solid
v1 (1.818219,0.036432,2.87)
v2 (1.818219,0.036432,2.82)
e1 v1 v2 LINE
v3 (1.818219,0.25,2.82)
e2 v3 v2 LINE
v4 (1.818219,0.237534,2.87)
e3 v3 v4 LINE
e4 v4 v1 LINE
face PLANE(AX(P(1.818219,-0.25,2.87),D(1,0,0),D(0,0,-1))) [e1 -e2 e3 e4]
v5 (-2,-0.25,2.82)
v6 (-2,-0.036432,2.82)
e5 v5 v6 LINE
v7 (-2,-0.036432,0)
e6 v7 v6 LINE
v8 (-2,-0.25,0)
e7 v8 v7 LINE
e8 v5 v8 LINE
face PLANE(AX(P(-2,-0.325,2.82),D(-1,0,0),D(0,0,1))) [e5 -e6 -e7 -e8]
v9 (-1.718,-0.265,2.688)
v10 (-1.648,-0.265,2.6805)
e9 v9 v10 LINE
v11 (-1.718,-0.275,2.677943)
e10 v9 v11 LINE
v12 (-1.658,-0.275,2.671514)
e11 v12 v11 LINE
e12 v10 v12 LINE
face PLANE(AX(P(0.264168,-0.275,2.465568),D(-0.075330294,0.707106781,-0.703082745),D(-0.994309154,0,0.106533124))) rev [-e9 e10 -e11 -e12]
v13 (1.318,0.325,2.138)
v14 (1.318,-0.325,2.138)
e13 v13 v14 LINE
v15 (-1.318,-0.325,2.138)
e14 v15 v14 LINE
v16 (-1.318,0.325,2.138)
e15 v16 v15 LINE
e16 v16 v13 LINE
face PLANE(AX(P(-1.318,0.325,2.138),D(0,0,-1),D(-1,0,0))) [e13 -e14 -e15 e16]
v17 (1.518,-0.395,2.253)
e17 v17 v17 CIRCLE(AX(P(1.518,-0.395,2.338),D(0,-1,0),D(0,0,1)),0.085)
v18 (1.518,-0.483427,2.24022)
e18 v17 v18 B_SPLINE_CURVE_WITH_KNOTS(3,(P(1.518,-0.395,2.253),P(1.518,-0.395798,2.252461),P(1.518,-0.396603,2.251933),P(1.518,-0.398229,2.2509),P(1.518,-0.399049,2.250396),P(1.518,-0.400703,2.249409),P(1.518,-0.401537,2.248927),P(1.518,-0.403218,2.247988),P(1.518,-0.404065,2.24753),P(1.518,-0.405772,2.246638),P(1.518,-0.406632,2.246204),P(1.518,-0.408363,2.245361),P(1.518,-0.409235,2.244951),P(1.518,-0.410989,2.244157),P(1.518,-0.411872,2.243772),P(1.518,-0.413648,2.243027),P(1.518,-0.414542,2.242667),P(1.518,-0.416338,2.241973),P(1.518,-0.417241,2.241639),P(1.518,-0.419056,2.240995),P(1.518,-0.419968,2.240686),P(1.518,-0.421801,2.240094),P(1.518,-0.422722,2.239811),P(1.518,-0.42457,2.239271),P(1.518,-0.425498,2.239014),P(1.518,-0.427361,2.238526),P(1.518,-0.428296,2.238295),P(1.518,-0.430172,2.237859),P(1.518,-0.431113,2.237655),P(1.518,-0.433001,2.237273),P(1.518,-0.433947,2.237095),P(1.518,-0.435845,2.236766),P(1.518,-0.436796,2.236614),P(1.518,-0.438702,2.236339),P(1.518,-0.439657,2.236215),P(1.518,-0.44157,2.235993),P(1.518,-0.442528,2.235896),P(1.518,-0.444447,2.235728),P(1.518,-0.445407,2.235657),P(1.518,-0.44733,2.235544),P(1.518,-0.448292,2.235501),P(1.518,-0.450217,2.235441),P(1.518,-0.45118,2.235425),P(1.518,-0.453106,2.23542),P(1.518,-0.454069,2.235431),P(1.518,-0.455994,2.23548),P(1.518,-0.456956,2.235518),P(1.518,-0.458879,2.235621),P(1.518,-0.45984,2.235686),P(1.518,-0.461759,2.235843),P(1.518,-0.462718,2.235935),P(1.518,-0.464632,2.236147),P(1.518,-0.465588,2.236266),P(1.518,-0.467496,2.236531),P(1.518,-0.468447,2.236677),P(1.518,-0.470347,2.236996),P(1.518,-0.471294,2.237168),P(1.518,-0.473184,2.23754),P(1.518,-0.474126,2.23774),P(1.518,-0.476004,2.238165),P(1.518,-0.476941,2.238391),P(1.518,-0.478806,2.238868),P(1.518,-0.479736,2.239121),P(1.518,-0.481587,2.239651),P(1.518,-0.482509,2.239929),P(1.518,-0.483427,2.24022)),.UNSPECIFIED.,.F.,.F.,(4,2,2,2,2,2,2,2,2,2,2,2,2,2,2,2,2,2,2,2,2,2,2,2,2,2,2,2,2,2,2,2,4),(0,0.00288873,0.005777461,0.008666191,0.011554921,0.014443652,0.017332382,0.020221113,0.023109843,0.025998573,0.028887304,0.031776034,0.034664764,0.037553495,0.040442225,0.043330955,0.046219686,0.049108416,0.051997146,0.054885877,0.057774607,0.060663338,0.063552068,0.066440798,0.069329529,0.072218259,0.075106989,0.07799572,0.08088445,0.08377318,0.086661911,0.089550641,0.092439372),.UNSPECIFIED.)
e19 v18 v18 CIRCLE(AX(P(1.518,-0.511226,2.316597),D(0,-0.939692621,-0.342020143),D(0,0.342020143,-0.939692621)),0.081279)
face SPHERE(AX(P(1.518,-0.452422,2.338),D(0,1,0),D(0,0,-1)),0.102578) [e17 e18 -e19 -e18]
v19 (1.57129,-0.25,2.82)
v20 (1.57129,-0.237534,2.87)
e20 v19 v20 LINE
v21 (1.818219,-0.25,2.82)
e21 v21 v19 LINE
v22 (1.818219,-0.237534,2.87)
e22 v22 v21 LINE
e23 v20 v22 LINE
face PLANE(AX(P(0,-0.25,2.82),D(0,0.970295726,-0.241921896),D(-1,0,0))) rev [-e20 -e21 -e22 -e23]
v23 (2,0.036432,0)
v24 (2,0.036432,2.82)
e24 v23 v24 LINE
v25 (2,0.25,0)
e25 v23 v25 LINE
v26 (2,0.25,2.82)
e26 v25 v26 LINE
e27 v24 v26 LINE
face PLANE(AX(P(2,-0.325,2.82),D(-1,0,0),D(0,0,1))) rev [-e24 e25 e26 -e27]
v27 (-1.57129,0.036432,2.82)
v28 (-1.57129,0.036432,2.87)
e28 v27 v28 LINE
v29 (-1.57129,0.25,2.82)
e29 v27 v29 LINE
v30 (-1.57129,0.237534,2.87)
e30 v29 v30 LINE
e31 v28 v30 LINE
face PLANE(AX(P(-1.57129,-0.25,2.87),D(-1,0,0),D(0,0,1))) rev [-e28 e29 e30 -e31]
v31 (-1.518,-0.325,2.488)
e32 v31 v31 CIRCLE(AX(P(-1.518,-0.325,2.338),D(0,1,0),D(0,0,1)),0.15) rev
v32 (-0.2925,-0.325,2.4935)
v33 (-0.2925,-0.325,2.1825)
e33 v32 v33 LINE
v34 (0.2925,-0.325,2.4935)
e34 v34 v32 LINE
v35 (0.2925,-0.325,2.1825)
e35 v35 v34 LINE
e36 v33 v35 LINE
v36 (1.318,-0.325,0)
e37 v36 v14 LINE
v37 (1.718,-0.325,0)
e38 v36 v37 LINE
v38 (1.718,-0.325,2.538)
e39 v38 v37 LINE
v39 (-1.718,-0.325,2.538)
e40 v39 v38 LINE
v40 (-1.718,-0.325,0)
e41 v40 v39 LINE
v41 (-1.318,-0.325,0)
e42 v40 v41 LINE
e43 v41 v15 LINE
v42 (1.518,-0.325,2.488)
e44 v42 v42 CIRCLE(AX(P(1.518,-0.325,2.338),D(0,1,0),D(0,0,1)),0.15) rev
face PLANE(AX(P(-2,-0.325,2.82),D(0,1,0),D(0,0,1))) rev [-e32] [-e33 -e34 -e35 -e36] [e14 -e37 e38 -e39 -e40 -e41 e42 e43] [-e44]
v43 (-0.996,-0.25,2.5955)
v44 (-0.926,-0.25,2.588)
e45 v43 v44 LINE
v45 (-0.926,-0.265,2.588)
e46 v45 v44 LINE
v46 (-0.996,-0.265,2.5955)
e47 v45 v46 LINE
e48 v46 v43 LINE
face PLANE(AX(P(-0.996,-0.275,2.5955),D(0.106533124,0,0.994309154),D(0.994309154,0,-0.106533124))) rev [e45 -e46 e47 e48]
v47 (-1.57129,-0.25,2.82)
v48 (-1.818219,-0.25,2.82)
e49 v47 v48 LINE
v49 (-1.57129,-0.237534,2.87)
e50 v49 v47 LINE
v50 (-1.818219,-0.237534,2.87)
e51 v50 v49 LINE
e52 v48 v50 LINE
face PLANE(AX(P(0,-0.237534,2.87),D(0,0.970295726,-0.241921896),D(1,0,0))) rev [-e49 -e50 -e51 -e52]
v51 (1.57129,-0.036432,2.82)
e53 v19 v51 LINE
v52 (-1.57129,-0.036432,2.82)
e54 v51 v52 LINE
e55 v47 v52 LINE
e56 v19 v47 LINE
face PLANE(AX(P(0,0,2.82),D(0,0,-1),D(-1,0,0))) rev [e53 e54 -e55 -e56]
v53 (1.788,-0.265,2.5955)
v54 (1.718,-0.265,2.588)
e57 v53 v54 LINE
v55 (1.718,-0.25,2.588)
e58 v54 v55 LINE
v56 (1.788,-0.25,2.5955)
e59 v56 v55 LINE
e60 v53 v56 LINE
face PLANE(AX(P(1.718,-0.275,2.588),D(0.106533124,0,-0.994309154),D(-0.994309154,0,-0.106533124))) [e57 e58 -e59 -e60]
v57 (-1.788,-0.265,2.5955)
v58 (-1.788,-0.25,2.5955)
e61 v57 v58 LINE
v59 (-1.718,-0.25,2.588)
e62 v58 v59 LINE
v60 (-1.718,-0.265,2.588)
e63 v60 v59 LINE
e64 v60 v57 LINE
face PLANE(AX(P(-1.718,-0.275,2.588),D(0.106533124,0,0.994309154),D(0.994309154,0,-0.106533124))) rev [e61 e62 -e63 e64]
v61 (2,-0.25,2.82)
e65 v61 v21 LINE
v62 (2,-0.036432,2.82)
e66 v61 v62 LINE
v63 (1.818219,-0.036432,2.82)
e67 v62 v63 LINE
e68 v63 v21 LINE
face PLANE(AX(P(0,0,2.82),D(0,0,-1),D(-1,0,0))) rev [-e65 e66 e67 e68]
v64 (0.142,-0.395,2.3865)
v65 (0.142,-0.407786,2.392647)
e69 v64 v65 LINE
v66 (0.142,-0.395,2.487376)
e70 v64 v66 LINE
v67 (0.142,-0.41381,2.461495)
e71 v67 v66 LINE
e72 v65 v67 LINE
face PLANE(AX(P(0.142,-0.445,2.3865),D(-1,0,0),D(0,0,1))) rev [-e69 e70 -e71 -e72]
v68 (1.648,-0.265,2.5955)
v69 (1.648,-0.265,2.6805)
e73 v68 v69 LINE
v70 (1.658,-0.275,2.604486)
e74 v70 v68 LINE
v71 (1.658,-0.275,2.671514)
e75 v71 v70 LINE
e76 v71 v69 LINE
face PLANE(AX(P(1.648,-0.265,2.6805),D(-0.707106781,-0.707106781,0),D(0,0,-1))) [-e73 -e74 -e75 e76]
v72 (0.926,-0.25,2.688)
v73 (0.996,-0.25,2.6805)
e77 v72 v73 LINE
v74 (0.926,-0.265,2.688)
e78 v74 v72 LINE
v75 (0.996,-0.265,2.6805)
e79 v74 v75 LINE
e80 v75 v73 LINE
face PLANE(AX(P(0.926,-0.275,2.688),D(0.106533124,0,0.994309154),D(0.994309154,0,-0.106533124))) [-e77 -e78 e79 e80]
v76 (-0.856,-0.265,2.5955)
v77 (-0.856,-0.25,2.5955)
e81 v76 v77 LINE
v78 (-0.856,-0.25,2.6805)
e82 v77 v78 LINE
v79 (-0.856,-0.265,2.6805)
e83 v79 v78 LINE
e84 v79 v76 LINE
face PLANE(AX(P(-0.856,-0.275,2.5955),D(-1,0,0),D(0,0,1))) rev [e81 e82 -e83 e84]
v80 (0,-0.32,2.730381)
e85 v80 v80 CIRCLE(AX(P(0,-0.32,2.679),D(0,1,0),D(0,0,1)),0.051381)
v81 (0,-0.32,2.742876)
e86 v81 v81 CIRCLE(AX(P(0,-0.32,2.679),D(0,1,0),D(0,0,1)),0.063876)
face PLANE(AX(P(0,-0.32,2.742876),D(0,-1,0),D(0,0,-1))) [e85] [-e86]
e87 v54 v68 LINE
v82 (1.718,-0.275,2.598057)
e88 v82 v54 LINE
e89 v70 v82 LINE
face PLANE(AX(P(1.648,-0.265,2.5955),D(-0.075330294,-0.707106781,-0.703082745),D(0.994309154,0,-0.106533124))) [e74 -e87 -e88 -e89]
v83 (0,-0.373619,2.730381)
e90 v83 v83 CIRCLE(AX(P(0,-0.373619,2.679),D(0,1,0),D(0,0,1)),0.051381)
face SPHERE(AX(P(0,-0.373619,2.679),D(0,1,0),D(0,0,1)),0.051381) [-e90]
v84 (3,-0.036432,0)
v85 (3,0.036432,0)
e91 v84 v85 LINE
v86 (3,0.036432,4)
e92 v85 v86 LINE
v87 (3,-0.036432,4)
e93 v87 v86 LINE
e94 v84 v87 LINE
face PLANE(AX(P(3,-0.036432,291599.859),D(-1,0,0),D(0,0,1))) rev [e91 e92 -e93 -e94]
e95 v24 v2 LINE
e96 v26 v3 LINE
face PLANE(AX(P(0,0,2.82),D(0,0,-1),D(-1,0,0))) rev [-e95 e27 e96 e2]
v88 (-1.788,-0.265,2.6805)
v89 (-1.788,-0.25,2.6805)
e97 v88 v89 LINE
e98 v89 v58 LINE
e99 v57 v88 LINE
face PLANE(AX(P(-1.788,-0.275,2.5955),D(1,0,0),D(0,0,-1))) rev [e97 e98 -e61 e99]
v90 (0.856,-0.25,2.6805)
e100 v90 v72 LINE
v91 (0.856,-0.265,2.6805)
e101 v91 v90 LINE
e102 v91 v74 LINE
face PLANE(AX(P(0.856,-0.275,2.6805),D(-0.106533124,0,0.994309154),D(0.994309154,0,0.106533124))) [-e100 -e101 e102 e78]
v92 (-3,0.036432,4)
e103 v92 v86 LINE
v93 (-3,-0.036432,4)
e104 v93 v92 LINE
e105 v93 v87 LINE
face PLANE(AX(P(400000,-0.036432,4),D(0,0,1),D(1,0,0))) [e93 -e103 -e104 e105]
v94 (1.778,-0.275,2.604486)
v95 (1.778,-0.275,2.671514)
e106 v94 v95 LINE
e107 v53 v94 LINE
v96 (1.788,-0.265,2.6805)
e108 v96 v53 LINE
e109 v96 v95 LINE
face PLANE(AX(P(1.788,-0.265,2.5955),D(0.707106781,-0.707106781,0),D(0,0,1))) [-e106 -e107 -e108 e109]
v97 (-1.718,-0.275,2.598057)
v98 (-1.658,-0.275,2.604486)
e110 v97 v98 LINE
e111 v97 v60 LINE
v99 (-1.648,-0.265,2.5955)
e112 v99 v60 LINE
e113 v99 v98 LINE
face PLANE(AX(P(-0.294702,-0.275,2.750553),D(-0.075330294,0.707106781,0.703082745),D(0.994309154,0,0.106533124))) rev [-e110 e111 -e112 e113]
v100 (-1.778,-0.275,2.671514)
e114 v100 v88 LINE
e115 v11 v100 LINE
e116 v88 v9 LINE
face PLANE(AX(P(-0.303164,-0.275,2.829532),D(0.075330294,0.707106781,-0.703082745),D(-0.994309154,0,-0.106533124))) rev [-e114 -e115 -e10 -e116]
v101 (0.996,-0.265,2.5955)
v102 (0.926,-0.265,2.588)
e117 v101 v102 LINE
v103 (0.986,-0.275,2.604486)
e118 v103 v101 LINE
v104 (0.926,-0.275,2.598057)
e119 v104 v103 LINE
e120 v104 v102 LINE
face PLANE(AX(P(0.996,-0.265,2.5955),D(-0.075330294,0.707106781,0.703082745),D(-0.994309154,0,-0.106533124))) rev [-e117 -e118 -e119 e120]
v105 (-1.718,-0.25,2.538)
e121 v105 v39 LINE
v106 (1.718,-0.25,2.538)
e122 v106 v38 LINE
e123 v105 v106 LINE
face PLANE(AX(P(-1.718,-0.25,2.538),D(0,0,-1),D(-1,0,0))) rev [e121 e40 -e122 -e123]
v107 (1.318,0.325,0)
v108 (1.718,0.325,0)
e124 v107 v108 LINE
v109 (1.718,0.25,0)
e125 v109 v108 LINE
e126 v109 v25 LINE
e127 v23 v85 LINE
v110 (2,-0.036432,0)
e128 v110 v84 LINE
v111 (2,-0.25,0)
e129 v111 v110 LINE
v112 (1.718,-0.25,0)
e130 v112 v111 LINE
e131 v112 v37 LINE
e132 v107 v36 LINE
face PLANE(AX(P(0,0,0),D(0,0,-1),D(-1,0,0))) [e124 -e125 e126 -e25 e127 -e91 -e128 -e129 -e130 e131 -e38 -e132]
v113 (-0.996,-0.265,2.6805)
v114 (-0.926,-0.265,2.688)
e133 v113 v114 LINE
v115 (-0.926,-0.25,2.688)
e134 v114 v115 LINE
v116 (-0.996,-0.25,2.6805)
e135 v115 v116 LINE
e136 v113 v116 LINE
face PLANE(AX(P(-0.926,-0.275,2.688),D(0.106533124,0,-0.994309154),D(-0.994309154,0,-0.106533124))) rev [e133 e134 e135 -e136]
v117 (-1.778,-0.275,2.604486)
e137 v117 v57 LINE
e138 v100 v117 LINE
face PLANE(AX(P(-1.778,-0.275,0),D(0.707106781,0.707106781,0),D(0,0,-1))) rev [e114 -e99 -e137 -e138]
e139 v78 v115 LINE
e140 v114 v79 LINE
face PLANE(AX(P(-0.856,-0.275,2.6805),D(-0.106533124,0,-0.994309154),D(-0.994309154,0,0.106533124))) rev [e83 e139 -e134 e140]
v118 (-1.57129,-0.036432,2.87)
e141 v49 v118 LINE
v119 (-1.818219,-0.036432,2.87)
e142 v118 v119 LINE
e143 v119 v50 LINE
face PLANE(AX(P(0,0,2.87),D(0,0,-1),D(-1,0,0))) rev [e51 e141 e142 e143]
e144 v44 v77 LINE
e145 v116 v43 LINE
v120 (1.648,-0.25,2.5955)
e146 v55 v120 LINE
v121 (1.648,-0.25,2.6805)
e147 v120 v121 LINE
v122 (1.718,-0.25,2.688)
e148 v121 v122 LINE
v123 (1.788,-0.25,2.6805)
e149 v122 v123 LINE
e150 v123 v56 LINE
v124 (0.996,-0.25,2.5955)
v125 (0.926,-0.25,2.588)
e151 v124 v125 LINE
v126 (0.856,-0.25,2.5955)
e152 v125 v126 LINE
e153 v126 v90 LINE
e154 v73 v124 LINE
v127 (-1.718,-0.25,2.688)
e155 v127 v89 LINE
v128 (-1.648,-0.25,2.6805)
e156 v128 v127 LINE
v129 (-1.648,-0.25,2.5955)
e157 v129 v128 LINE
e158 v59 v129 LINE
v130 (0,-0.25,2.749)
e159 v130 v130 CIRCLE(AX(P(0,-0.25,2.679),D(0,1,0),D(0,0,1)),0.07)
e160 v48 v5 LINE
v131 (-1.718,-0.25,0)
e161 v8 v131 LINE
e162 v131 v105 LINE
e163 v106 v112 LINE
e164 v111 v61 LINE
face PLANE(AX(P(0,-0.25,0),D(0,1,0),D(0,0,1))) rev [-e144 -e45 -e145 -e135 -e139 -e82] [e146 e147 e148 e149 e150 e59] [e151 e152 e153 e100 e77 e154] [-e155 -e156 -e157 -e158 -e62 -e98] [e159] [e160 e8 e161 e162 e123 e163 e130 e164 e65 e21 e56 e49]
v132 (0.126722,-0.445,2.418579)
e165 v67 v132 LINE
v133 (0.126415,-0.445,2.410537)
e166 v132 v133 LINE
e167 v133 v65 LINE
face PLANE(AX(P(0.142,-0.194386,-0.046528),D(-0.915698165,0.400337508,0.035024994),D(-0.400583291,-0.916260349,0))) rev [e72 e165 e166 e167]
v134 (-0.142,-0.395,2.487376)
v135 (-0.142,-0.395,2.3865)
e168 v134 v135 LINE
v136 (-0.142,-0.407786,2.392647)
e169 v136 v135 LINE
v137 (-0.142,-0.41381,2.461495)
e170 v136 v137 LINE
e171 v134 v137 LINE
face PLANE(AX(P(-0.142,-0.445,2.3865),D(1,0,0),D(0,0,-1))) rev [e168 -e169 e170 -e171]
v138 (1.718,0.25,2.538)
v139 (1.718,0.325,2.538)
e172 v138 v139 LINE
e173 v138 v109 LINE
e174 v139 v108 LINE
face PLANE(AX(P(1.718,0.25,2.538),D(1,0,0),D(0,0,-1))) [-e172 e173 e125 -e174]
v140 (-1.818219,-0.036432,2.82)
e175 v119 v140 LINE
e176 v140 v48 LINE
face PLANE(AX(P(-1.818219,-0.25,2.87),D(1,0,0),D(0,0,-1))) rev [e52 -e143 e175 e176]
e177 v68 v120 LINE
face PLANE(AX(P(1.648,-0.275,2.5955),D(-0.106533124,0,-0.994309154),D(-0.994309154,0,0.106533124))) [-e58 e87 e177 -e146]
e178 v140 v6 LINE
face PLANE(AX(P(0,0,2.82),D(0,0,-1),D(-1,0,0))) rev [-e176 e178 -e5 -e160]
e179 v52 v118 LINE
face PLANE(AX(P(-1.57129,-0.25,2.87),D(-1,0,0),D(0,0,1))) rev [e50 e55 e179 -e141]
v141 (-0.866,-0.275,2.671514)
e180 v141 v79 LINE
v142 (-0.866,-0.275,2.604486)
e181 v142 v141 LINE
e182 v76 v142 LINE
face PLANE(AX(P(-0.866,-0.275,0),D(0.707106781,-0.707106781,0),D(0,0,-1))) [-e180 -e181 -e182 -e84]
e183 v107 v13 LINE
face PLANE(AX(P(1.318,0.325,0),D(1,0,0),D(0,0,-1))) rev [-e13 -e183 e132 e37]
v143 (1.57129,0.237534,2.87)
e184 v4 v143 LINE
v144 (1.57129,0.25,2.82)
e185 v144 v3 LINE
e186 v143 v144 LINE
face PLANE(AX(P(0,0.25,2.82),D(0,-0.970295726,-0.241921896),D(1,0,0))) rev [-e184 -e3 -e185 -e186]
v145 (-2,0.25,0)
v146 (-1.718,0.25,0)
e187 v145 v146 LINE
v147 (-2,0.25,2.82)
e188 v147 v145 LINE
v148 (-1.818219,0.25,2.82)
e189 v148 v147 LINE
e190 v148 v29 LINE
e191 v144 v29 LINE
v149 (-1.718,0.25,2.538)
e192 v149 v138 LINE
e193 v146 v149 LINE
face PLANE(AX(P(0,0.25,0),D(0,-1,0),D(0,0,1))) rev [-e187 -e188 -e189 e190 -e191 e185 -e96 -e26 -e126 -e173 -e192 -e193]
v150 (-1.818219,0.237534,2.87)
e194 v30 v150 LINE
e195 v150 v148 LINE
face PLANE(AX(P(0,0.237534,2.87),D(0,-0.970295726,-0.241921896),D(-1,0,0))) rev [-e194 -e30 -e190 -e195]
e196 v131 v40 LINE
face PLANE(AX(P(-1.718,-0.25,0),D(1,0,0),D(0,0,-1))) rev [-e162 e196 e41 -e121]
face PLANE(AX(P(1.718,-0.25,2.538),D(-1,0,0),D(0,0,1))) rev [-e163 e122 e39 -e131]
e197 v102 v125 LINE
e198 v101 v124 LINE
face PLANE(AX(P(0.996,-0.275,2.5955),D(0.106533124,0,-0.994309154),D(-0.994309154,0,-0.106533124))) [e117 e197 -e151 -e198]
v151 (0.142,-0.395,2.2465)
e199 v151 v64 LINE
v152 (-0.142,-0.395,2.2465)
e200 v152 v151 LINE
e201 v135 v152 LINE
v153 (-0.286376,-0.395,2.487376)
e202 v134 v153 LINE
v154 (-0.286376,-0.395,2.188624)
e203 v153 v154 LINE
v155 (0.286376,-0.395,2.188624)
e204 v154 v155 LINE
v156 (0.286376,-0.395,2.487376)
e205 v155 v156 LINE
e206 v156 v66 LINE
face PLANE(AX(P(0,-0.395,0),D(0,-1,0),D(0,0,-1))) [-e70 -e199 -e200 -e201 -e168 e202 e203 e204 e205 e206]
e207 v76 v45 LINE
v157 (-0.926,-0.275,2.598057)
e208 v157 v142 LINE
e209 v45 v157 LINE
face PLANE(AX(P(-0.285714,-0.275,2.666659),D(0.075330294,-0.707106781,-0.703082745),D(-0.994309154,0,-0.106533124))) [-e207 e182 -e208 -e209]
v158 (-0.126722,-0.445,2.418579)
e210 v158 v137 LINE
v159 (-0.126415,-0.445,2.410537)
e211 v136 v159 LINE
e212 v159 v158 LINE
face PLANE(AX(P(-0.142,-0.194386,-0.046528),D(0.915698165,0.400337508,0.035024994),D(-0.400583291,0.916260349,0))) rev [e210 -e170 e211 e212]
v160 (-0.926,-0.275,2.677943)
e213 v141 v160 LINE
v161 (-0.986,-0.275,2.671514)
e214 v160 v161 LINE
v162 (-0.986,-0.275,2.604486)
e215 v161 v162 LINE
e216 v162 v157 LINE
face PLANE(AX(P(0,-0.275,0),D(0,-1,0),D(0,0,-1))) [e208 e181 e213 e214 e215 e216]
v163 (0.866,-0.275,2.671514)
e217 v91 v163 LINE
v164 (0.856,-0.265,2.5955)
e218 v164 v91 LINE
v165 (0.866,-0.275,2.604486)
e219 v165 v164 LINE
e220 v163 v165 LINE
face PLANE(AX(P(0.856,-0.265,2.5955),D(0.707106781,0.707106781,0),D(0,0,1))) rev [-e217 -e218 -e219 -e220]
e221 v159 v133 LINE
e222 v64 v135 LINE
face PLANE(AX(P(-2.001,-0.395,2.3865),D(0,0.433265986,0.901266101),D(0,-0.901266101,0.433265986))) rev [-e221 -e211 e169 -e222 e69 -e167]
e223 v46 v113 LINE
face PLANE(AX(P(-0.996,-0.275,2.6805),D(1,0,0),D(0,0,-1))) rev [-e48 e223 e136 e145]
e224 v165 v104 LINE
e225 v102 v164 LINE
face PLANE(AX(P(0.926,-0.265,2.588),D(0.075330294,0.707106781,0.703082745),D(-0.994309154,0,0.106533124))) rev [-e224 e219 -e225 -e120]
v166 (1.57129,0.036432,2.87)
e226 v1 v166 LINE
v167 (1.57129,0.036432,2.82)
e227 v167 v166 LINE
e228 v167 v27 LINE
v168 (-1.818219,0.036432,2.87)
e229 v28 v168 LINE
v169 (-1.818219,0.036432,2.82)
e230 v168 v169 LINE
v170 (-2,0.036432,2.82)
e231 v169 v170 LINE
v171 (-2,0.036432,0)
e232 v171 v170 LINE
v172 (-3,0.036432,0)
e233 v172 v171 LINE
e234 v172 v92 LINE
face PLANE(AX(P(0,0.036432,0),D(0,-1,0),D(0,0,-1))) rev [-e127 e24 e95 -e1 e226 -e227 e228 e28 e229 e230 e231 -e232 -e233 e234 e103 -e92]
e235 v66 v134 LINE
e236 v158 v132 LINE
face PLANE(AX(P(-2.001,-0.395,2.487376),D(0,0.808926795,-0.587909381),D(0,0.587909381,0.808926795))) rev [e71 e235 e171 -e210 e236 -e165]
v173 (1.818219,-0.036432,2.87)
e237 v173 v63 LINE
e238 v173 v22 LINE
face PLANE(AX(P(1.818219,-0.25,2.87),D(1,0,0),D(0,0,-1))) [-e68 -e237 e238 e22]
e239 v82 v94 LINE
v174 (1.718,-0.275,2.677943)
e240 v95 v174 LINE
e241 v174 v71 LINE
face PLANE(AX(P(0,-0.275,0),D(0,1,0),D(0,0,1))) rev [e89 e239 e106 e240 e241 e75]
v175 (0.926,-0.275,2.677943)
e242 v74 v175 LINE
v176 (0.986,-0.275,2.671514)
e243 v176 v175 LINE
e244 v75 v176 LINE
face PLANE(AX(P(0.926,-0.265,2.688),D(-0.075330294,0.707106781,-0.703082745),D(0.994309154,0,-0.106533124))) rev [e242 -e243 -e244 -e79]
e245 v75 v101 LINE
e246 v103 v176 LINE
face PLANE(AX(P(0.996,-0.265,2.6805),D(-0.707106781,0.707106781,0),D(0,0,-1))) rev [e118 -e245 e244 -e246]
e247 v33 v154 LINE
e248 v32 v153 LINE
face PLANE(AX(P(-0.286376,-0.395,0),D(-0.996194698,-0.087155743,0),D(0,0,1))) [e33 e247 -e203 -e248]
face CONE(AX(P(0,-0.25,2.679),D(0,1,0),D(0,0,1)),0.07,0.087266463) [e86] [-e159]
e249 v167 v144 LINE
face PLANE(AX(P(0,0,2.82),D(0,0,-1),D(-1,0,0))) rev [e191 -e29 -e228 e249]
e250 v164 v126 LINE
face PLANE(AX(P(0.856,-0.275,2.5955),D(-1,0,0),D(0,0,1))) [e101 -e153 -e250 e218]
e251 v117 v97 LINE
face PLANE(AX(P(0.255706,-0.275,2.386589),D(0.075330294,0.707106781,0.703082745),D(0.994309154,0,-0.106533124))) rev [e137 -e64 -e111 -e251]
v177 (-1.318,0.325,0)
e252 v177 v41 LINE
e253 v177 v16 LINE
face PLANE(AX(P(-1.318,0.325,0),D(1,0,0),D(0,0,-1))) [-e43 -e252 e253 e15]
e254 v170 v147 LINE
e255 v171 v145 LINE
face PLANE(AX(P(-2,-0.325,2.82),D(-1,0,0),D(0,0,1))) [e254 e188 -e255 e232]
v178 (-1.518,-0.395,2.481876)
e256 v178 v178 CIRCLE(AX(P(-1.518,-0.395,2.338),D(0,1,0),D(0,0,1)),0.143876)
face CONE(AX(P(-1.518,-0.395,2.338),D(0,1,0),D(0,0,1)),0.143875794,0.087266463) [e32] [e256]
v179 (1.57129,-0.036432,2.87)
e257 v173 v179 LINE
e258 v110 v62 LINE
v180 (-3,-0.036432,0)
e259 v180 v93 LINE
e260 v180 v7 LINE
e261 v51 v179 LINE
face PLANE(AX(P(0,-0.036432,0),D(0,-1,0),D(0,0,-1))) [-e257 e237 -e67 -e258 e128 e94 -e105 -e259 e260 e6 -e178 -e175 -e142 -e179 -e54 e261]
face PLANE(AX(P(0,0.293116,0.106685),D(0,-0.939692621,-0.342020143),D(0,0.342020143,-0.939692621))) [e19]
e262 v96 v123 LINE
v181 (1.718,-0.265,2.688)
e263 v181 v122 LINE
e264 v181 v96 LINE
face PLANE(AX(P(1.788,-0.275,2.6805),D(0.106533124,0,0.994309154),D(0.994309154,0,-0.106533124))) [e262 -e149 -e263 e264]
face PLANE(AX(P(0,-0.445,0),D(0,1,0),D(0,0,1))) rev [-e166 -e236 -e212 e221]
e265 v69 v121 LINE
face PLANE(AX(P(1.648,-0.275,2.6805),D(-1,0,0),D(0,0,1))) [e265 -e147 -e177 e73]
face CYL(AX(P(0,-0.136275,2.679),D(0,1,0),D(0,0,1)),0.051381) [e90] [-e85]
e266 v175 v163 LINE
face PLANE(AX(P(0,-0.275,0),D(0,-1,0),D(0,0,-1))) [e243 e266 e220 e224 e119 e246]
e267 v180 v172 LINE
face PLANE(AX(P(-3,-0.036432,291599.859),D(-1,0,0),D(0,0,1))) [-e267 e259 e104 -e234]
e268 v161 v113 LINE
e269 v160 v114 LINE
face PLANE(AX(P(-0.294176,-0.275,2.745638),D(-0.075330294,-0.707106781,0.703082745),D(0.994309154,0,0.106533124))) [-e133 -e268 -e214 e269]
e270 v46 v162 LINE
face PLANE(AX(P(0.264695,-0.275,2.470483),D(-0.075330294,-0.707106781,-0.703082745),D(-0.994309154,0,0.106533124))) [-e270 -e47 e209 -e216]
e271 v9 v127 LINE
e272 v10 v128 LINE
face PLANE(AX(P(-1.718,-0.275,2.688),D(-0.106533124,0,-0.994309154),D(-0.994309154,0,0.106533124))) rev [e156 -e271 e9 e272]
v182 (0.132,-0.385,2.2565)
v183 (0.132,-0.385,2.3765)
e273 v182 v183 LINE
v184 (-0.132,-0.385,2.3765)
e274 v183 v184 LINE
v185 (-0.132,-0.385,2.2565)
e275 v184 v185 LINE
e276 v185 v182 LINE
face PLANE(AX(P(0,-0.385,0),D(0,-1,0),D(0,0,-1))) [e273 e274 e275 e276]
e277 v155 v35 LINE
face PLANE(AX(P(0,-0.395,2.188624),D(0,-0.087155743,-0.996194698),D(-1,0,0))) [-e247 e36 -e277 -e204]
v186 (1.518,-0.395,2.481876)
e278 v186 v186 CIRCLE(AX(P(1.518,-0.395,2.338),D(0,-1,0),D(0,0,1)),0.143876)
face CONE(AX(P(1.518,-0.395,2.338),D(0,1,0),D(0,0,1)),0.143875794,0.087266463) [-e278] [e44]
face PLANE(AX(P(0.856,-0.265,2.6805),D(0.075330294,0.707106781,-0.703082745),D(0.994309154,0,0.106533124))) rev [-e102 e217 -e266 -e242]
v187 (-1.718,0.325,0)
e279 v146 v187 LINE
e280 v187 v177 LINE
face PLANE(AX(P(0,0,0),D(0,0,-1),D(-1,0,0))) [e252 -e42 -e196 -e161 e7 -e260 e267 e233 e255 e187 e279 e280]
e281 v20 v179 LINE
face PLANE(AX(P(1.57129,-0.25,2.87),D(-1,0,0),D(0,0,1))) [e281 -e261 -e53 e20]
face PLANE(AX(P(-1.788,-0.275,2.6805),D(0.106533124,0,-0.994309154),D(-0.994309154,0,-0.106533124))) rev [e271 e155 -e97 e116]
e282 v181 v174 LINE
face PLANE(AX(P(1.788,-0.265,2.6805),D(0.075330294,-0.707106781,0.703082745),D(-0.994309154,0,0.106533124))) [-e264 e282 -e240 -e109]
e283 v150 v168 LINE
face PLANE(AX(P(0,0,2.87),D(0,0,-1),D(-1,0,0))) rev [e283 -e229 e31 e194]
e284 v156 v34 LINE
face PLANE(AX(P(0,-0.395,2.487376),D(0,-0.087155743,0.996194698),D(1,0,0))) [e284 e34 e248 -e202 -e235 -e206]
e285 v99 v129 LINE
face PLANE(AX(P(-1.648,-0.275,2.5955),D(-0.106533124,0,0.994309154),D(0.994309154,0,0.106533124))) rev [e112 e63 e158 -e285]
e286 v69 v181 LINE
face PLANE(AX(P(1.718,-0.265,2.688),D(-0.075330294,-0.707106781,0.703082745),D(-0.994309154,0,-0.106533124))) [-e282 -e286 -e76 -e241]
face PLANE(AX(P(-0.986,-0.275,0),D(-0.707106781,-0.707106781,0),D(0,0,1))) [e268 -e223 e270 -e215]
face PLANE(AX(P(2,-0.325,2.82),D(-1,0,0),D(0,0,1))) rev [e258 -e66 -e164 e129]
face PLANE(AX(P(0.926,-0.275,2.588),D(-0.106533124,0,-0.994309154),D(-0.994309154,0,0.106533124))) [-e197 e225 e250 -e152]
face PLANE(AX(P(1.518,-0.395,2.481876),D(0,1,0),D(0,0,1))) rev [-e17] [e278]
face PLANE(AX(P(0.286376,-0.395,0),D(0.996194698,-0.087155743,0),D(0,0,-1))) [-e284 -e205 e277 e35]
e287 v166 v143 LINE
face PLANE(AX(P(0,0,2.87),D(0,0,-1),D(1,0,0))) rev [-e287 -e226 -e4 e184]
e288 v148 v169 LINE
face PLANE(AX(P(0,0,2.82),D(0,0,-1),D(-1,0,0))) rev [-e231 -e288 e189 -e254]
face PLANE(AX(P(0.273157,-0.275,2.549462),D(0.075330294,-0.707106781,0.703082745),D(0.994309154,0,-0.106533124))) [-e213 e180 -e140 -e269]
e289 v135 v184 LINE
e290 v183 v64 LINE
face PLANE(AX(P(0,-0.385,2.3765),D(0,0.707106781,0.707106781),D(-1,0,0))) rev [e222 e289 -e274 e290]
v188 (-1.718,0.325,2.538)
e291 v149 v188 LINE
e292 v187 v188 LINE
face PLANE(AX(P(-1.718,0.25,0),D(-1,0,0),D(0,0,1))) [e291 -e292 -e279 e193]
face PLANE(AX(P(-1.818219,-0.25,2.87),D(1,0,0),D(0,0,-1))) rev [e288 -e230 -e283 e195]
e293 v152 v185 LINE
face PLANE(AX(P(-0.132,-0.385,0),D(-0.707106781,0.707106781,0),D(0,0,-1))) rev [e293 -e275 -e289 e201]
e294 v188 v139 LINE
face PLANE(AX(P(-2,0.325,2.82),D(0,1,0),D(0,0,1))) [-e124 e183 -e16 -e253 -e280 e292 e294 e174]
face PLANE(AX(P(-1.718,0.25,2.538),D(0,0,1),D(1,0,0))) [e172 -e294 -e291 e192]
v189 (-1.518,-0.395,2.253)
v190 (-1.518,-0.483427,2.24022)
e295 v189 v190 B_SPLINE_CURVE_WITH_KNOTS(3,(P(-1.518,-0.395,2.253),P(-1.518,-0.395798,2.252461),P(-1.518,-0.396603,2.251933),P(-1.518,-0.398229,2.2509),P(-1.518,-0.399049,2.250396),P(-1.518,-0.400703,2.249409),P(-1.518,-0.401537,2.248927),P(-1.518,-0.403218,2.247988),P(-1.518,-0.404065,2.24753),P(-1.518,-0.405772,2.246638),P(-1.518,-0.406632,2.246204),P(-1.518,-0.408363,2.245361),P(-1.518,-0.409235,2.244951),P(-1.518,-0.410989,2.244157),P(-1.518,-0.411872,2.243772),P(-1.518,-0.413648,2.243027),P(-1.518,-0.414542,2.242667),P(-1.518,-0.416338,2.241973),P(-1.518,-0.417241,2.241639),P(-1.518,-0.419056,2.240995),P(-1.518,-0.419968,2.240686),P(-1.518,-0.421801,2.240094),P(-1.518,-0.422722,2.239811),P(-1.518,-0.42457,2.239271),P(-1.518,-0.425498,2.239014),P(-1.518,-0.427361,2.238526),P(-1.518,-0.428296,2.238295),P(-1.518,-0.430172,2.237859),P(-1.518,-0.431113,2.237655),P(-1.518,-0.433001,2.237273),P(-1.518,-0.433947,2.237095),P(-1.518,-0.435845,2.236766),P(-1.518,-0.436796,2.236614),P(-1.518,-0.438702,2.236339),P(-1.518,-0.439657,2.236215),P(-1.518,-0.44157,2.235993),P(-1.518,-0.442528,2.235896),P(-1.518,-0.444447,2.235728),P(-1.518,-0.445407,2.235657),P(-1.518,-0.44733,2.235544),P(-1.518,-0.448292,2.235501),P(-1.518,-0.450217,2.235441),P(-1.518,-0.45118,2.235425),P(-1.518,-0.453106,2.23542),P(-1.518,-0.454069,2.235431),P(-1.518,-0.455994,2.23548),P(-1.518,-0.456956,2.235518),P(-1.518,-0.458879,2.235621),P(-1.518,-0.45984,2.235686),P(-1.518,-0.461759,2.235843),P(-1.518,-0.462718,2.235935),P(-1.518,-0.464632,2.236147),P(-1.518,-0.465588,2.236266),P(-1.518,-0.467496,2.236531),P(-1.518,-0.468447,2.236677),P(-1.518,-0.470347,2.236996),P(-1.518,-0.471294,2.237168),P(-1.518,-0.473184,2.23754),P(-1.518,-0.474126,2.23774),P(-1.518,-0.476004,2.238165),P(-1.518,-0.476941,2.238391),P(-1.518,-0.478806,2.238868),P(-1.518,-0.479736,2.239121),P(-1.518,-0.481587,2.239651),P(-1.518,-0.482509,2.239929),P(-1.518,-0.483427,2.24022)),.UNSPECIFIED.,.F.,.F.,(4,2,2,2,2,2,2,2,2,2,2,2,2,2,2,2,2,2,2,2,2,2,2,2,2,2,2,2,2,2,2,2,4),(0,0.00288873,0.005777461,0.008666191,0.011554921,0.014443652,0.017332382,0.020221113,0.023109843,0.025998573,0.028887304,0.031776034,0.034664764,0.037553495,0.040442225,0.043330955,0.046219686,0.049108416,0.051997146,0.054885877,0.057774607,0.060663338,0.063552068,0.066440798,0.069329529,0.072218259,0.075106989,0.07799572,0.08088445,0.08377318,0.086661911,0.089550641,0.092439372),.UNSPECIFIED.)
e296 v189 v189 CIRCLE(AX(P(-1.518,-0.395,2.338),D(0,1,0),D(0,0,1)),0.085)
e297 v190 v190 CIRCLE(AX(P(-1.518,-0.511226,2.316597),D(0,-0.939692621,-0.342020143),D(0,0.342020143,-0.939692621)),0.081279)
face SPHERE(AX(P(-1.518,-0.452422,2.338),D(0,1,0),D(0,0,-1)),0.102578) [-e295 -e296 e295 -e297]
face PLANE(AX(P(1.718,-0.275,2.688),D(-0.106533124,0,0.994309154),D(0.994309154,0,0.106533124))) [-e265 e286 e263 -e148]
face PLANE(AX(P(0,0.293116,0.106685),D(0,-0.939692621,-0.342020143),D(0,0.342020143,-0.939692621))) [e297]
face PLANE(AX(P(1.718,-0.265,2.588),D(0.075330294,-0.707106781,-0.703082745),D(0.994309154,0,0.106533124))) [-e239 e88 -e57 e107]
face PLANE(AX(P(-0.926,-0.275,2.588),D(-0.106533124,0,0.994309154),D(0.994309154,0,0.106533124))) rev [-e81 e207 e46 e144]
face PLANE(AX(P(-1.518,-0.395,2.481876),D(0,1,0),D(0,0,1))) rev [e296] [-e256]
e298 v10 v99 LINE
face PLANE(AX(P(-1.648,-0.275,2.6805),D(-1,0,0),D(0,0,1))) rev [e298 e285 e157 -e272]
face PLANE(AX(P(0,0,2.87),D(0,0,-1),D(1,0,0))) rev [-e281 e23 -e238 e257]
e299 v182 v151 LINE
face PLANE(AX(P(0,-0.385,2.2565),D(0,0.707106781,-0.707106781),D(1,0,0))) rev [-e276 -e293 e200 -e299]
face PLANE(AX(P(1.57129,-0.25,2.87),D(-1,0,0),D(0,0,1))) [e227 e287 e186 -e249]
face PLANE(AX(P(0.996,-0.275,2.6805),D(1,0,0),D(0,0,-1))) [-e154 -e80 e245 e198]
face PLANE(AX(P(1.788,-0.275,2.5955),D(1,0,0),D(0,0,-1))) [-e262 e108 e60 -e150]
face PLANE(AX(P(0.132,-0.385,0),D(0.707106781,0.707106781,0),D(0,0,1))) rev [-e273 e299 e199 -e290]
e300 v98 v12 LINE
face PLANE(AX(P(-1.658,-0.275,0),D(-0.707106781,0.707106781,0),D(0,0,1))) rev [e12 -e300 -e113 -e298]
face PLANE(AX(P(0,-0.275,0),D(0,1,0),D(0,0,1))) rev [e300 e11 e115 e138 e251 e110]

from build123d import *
from OCP.BRepFilletAPI import BRepFilletAPI_MakeChamfer

# Parameters (mm, degrees)
SKETCH1_W                 = 4
SKETCH1_H                 = 0.65
BOSS_EXTRUDE1_DEPTH       = 2.82
CUT_EXTRUDE1_DEPTH        = 0.075
SKETCH3_W                 = 2.636
SKETCH3_H                 = 2.138
CUT_EXTRUDE2_DEPTH        = 4.517797606
BOSS_EXTRUDE2_DEPTH       = 0.025
CHAMFER1_SIZE             = 0.01
SKETCH8_W                 = 0.439976945
SKETCH8_H                 = 0.57304899
CUT_EXTRUDE3_DEPTH        = 0.04
SKETCH9_W                 = 0.585
SKETCH9_H                 = 0.311
BOSS_EXTRUDE3_DEPTH       = 0.07
CHAMFER2_SIZE             = 0.07
CHAMFER2_SIZE_2           = 0.006124206
SKETCH10_W                = 0.284
SKETCH10_H                = 0.14
CUT_EXTRUDE4_DEPTH        = 0.01
CHAMFER3_SIZE             = 0.01
SKETCH11_W                = 0.284
SKETCH11_H                = 0.100875794
BOSS_EXTRUDE4_DEPTH       = 0.05
CUT_EXTRUDE5_REACH        = 5.582
CUT_EXTRUDE6_REACH        = 5.25
SKETCH14_W                = 0.246928611
SKETCH14_H                = 0.5
BOSS_EXTRUDE5_DEPTH       = 0.05
CHAMFER4_SIZE             = 0.05
CHAMFER4_SIZE2            = 0.0124664
CHAMFER4_OF_MIRROR4_SIZE  = 0.05
CHAMFER4_OF_MIRROR4_SIZE2 = 0.0124664
BOSS_EXTRUDE6_START       = -0.25
BOSS_EXTRUDE6_DEPTH       = 0.0364325


# Some blends are built 0.0001 mm under size
with BuildPart() as part:
    # Sketch1 → Boss-Extrude1 (new body)
    with BuildSketch(Plane.XY):
        Rectangle(SKETCH1_W, SKETCH1_H)
    extrude(amount=BOSS_EXTRUDE1_DEPTH)

    # Sketch2 → Cut-Extrude1 (cut)
    with BuildSketch(Plane.XZ.offset(0.325)):
        Polygon((-2, 0), (-1.718, 0), (-1.718, 2.538), (1.718, 2.538), (1.718, 0), (2, 0), (2, 2.82), (-2, 2.82), align=None)
    cut_extrude1 = extrude(amount=-CUT_EXTRUDE1_DEPTH, mode=Mode.SUBTRACT)

    # Sketch3 → Cut-Extrude2 (cut, through all)
    with BuildSketch(Plane.XZ.offset(0.325)):
        with Locations((0, 1.069)):
            Rectangle(SKETCH3_W, SKETCH3_H)
    extrude(amount=-CUT_EXTRUDE2_DEPTH, mode=Mode.SUBTRACT)

    # Mirror1: Cut-Extrude1 across plane
    add(cut_extrude1.mirror(Plane(origin=(0, 0, 0), x_dir=(0, 0, 1), z_dir=(0, -1, 0))), mode=Mode.SUBTRACT)

    # Sketch4 → Boss-Extrude2 (add)
    with BuildSketch(Plane.XZ.offset(0.25)):
        Polygon((-1.788, 2.6805), (-1.718, 2.688), (-1.648, 2.6805), (-1.648, 2.5955), (-1.718, 2.588), (-1.788, 2.5955), align=None)
        Polygon((-0.996, 2.6805), (-0.996, 2.5955), (-0.926, 2.588), (-0.856, 2.5955), (-0.856, 2.6805), (-0.926, 2.688), align=None)
    boss_extrude2 = extrude(amount=BOSS_EXTRUDE2_DEPTH)

    # Mirror2: Boss-Extrude2 across plane
    add(boss_extrude2.mirror(Plane(origin=(0, 0, 0), x_dir=(0, 0, 1), z_dir=(1, 0, 0))))

    # Chamfer1
    chamfer1_edges = [part.edges().sort_by_distance(p)[0] for p in [
        (-0.856, -0.275, 2.638),
        (-0.891, -0.275, 2.68425),
        (1.788, -0.275, 2.638),
        (1.753, -0.275, 2.68425),
        (1.683, -0.275, 2.68425),
        (1.648, -0.275, 2.638),
        (1.683, -0.275, 2.59175),
        (1.753, -0.275, 2.59175),
        (0.961, -0.275, 2.68425),
        (0.891, -0.275, 2.68425),
        (0.856, -0.275, 2.638),
        (0.891, -0.275, 2.59175),
        (0.961, -0.275, 2.59175),
        (0.996, -0.275, 2.638),
        (-1.788, -0.275, 2.638),
        (-1.753, -0.275, 2.59175),
        (-1.683, -0.275, 2.59175),
        (-1.648, -0.275, 2.638),
        (-1.683, -0.275, 2.68425),
        (-1.753, -0.275, 2.68425),
        (-0.961, -0.275, 2.68425),
        (-0.996, -0.275, 2.638),
        (-0.961, -0.275, 2.59175),
        (-0.891, -0.275, 2.59175),
    ]]
    chamfer(chamfer1_edges, length=CHAMFER1_SIZE)

    # Sketch5 → Revolve1 (revolve)
    with BuildSketch(Plane(origin=(0, 0, 0), x_dir=(0, 0, -1), z_dir=(1, 0, 0))):
        with BuildLine():
            Line((-2.749, -0.25), (-2.742875794, -0.32))
            Line((-2.742875794, -0.32), (-2.730380956, -0.32))
            Line((-2.730380956, -0.32), (-2.730380956, -0.373619044))
            ThreePointArc((-2.730380956, -0.373619044), (-2.715331822, -0.409950867), (-2.679, -0.425))
            Line((-2.679, -0.425), (-2.679, -0.25))
            Line((-2.679, -0.25), (-2.749, -0.25))
        make_face()
    revolve(axis=Axis((0, -0.136274993, 2.679), (0, -1, 0)))

    # Sketch6 → Revolve2 (revolve)
    with BuildSketch(Plane.ZY.offset(1.518), mode=Mode.PRIVATE) as revolve2_sk:
        with BuildLine():
            Line((2.488, -0.325), (2.481875794, -0.395))
            Line((2.481875794, -0.395), (2.423, -0.395))
            ThreePointArc((2.423, -0.395), (2.428588355, -0.500546938), (2.338, -0.555))
            Line((2.338, -0.555), (2.338, -0.325))
            Line((2.338, -0.325), (2.488, -0.325))
        make_face()
    revolve2 = revolve(revolve2_sk.sketch.rotate(Axis((-1.518, -0.325, 2.338), (0, -1, 0)), 180), axis=Axis((-1.518, -0.325, 2.338), (0, -1, 0)))

    # Sketch8 → Cut-Extrude3 (cut)
    with BuildSketch(Plane(origin=(0, 0.255528239, 0.093004673), x_dir=(-1, 0, 0), z_dir=(0, -0.9396926207859105, -0.34202014332566305))):
        with Locations((1.555484276, -2.396112054)):
            Rectangle(SKETCH8_W, SKETCH8_H)
    cut_extrude3 = extrude(amount=-CUT_EXTRUDE3_DEPTH, mode=Mode.SUBTRACT)

    # Mirror3: Revolve2, Cut-Extrude3 across plane
    add(revolve2.mirror(Plane(origin=(0, 0, 0), x_dir=(0, 0, 1), z_dir=(1, 0, 0))))
    add(cut_extrude3.mirror(Plane(origin=(0, 0, 0), x_dir=(0, 0, 1), z_dir=(1, 0, 0))), mode=Mode.SUBTRACT)

    # Sketch9 → Boss-Extrude3 (add)
    with BuildSketch(Plane.XZ.offset(0.325)):
        with Locations((0, 2.338)):
            Rectangle(SKETCH9_W, SKETCH9_H)
    extrude(amount=BOSS_EXTRUDE3_DEPTH)

    # Chamfer2
    # the kernel refuses this chamfer: 0.07, 0.006124206 mm, written as the material it takes off along each edge
    with BuildSketch(Plane(origin=(-0.474474386, -0.395, 2.4935), x_dir=(0, 0.9999943799678763, 0.00335261579403213), z_dir=(1, 0, 0))) as chamfer2_piece_1_section:
        Polygon((CHAMFER2_SIZE * 0.999994379968, -CHAMFER2_SIZE * 0.00335261579403), (-CHAMFER2_SIZE_2 * 0.00335261603863, -CHAMFER2_SIZE_2 * 0.999994452926), (0, 0), align=None)
    chamfer2_piece_1 = extrude(amount=0.948948771, mode=Mode.PRIVATE)
    chamfer2_piece_1 = split(chamfer2_piece_1, bisect_by=Plane(origin=(0, -0.325, 2.492252254), z_dir=(0, -1, 0)), keep=Keep.TOP, mode=Mode.PRIVATE)
    add(chamfer2_piece_1, mode=Mode.SUBTRACT)
    with BuildSketch(Plane(origin=(0.2925, -0.395, 2.675474386), x_dir=(0.003352615794032893, 0.9999943799678763, 0), z_dir=(0, 0, -1))) as chamfer2_piece_2_section:
        Polygon((CHAMFER2_SIZE * 0.999994379968, -CHAMFER2_SIZE * 0.00335261579403), (-CHAMFER2_SIZE_2 * 0.00335261603864, -CHAMFER2_SIZE_2 * 0.999994452926), (0, 0), align=None)
    chamfer2_piece_2 = extrude(amount=0.674948771, mode=Mode.PRIVATE)
    chamfer2_piece_2 = split(chamfer2_piece_2, bisect_by=Plane(origin=(0.291252254, -0.325, 2.338), z_dir=(0, -1, 0)), keep=Keep.TOP, mode=Mode.PRIVATE)
    add(chamfer2_piece_2, mode=Mode.SUBTRACT)
    with BuildSketch(Plane(origin=(0.474474386, -0.395, 2.1825), x_dir=(0, 0.9999943799678763, -0.00335261579403213), z_dir=(-1, 0, 0))) as chamfer2_piece_3_section:
        Polygon((CHAMFER2_SIZE * 0.999994379968, -CHAMFER2_SIZE * 0.00335261579403), (-CHAMFER2_SIZE_2 * 0.00335261603863, -CHAMFER2_SIZE_2 * 0.999994452926), (0, 0), align=None)
    chamfer2_piece_3 = extrude(amount=0.948948771, mode=Mode.PRIVATE)
    chamfer2_piece_3 = split(chamfer2_piece_3, bisect_by=Plane(origin=(0, -0.325, 2.183747746), z_dir=(0, -1, 0)), keep=Keep.TOP, mode=Mode.PRIVATE)
    add(chamfer2_piece_3, mode=Mode.SUBTRACT)
    with BuildSketch(Plane(origin=(-0.2925, -0.395, 2.000525614), x_dir=(-0.003352615794032893, 0.9999943799678763, 0), z_dir=(0, 0, 1))) as chamfer2_piece_4_section:
        Polygon((CHAMFER2_SIZE * 0.999994379968, -CHAMFER2_SIZE * 0.00335261579403), (-CHAMFER2_SIZE_2 * 0.00335261603864, -CHAMFER2_SIZE_2 * 0.999994452926), (0, 0), align=None)
    chamfer2_piece_4 = extrude(amount=0.674948771, mode=Mode.PRIVATE)
    chamfer2_piece_4 = split(chamfer2_piece_4, bisect_by=Plane(origin=(-0.291252254, -0.325, 2.338), z_dir=(0, -1, 0)), keep=Keep.TOP, mode=Mode.PRIVATE)
    add(chamfer2_piece_4, mode=Mode.SUBTRACT)

    # Sketch10 → Cut-Extrude4 (cut)
    with BuildSketch(Plane.XZ.offset(0.395)):
        with Locations((0, 2.3165)):
            Rectangle(SKETCH10_W, SKETCH10_H)
    extrude(amount=-CUT_EXTRUDE4_DEPTH, mode=Mode.SUBTRACT)

    # Chamfer3
    chamfer3_edges = [part.edges().sort_by_distance(p)[0] for p in [
        (0, -0.385, 2.3865),
        (0.142, -0.385, 2.3165),
        (0, -0.385, 2.2465),
        (-0.142, -0.385, 2.3165),
    ]]
    chamfer(chamfer3_edges, length=CHAMFER3_SIZE - 0.0001)  # a hair under: the kernel refuses the full size

    # Sketch11 → Boss-Extrude4 (add)
    with BuildSketch(Plane.XZ.offset(0.395)):
        with Locations((0, 2.436937897)):
            Rectangle(SKETCH11_W, SKETCH11_H)
    extrude(amount=BOSS_EXTRUDE4_DEPTH)

    # Sketch12 → Cut-Extrude5 (cut, up to next)
    with BuildSketch(Plane(origin=(0.142, 0, 0), x_dir=(0, 0, -1), z_dir=(1, 0, 0)), mode=Mode.PRIVATE) as cut_extrude5_sk1:
        Polygon((-2.487375794, -0.445), (-2.487375794, -0.395), (-2.418578899, -0.445), align=None)
    cut_extrude5_tool1 = extrude(cut_extrude5_sk1.sketch, amount=-CUT_EXTRUDE5_REACH, mode=Mode.PRIVATE) & part.part
    # Sketch12 → Cut-Extrude5 (cut, up to next)
    with BuildSketch(Plane(origin=(0.142, 0, 0), x_dir=(0, 0, -1), z_dir=(1, 0, 0)), mode=Mode.PRIVATE) as cut_extrude5_sk2:
        Polygon((-2.3865, -0.395), (-2.410536518, -0.445), (-2.3865, -0.445), align=None)
    cut_extrude5_tool2 = extrude(cut_extrude5_sk2.sketch, amount=-CUT_EXTRUDE5_REACH, mode=Mode.PRIVATE) & part.part
    add(cut_extrude5_tool1.solids().sort_by_distance((0.142, -0.428333, 2.464443))[0], mode=Mode.SUBTRACT)
    add(cut_extrude5_tool2.solids().sort_by_distance((0.142, -0.428333, 2.394512))[0], mode=Mode.SUBTRACT)

    # Sketch13 → Cut-Extrude6 (cut, up to next)
    with BuildSketch(Plane(origin=(0, -0.218964606, 2.502776895), x_dir=(1, 0, 0), z_dir=(0, -0.08715574274765381, 0.996194698091746)), mode=Mode.PRIVATE) as cut_extrude6_sk1:
        Polygon((-0.142, -0.19770153), (-0.126414627, -0.23321454), (-0.142, -0.23321454), align=None)
    cut_extrude6_tool1 = extrude(cut_extrude6_sk1.sketch, amount=-CUT_EXTRUDE6_REACH, mode=Mode.PRIVATE) & part.part
    # Sketch13 → Cut-Extrude6 (cut, up to next)
    with BuildSketch(Plane(origin=(0, -0.218964606, 2.502776895), x_dir=(1, 0, 0), z_dir=(0, -0.08715574274765381, 0.996194698091746)), mode=Mode.PRIVATE) as cut_extrude6_sk2:
        Polygon((0.142, -0.19770153), (0.126414627, -0.23321454), (0.142, -0.23321454), align=None)
    cut_extrude6_tool2 = extrude(cut_extrude6_sk2.sketch, amount=-CUT_EXTRUDE6_REACH, mode=Mode.PRIVATE) & part.part
    add(cut_extrude6_tool1.solids().sort_by_distance((-0.136805, -0.439499, 2.483483))[0], mode=Mode.SUBTRACT)
    add(cut_extrude6_tool2.solids().sort_by_distance((0.136805, -0.439499, 2.483483))[0], mode=Mode.SUBTRACT)

    # Sketch14 → Boss-Extrude5 (add)
    with BuildSketch(Plane.XY.offset(2.82)):
        with Locations((-1.694754599, 0)):
            Rectangle(SKETCH14_W, SKETCH14_H)
    boss_extrude5 = extrude(amount=BOSS_EXTRUDE5_DEPTH)

    # Chamfer4: one chamfer whose edges measure the first distance from different faces: ONE call of the kernel's chamfer builder (chamfer() names one face for all edges)
    chamfer4_edges_1 = [part.edges().sort_by_distance(p)[0] for p in [
        (-1.694754599, 0.25, 2.87),
    ]]
    chamfer4_side_1 = [part.faces().sort_by_distance(p)[0] for p in [
        (-1.859, 0.25, 0.049230986),
    ]]
    chamfer4_edges_2 = [part.edges().sort_by_distance(p)[0] for p in [
        (-1.694754599, -0.25, 2.87),
    ]]
    chamfer4_side_2 = [part.faces().sort_by_distance(p)[0] for p in [
        (-1.859, -0.25, 0.049230986),
    ]]
    chamfer4 = BRepFilletAPI_MakeChamfer(part.part.solid().wrapped)
    for e in chamfer4_edges_1:
        chamfer4.Add(CHAMFER4_SIZE, CHAMFER4_SIZE2, e.wrapped, chamfer4_side_1[0].wrapped)  # the first distance lies on this face
    for e in chamfer4_edges_2:
        chamfer4.Add(CHAMFER4_SIZE, CHAMFER4_SIZE2, e.wrapped, chamfer4_side_2[0].wrapped)  # the first distance lies on this face
    add(Compound.cast(chamfer4.Shape()), mode=Mode.REPLACE)

    # Mirror4: Boss-Extrude5 across plane
    add(boss_extrude5.mirror(Plane(origin=(0, 0, 0), x_dir=(0, 0, 1), z_dir=(1, 0, 0))))

    # Chamfer4 of Mirror4: one chamfer whose edges measure the first distance from different faces: ONE call of the kernel's chamfer builder (chamfer() names one face for all edges)
    chamfer4_of_mirror4_edges_1 = [part.edges().sort_by_distance(p)[0] for p in [
        (1.694754599, 0.25, 2.87),
    ]]
    chamfer4_of_mirror4_side_1 = [part.faces().sort_by_distance(p)[0] for p in [
        (1.859, 0.25, 0.049230986),
    ]]
    chamfer4_of_mirror4_edges_2 = [part.edges().sort_by_distance(p)[0] for p in [
        (1.694754599, -0.25, 2.87),
    ]]
    chamfer4_of_mirror4_side_2 = [part.faces().sort_by_distance(p)[0] for p in [
        (1.859, -0.25, 0.049230986),
    ]]
    chamfer4_of_mirror4 = BRepFilletAPI_MakeChamfer(part.part.solid().wrapped)
    for e in chamfer4_of_mirror4_edges_1:
        chamfer4_of_mirror4.Add(CHAMFER4_OF_MIRROR4_SIZE, CHAMFER4_OF_MIRROR4_SIZE2, e.wrapped, chamfer4_of_mirror4_side_1[0].wrapped)  # the first distance lies on this face
    for e in chamfer4_of_mirror4_edges_2:
        chamfer4_of_mirror4.Add(CHAMFER4_OF_MIRROR4_SIZE, CHAMFER4_OF_MIRROR4_SIZE2, e.wrapped, chamfer4_of_mirror4_side_2[0].wrapped)  # the first distance lies on this face
    add(Compound.cast(chamfer4_of_mirror4.Shape()), mode=Mode.REPLACE)

    # Sketch15 → Boss-Extrude6 (add, symmetric)
    with BuildSketch(Plane.XZ.offset(0.25).offset(BOSS_EXTRUDE6_START)):
        Polygon((-3, 0), (-1.318, 0), (-1.318, 2.138), (1.318, 2.138), (1.318, 0), (3, 0), (3, 4), (-3, 4), align=None)
    extrude(amount=BOSS_EXTRUDE6_DEPTH, both=True)


solid = part.part
